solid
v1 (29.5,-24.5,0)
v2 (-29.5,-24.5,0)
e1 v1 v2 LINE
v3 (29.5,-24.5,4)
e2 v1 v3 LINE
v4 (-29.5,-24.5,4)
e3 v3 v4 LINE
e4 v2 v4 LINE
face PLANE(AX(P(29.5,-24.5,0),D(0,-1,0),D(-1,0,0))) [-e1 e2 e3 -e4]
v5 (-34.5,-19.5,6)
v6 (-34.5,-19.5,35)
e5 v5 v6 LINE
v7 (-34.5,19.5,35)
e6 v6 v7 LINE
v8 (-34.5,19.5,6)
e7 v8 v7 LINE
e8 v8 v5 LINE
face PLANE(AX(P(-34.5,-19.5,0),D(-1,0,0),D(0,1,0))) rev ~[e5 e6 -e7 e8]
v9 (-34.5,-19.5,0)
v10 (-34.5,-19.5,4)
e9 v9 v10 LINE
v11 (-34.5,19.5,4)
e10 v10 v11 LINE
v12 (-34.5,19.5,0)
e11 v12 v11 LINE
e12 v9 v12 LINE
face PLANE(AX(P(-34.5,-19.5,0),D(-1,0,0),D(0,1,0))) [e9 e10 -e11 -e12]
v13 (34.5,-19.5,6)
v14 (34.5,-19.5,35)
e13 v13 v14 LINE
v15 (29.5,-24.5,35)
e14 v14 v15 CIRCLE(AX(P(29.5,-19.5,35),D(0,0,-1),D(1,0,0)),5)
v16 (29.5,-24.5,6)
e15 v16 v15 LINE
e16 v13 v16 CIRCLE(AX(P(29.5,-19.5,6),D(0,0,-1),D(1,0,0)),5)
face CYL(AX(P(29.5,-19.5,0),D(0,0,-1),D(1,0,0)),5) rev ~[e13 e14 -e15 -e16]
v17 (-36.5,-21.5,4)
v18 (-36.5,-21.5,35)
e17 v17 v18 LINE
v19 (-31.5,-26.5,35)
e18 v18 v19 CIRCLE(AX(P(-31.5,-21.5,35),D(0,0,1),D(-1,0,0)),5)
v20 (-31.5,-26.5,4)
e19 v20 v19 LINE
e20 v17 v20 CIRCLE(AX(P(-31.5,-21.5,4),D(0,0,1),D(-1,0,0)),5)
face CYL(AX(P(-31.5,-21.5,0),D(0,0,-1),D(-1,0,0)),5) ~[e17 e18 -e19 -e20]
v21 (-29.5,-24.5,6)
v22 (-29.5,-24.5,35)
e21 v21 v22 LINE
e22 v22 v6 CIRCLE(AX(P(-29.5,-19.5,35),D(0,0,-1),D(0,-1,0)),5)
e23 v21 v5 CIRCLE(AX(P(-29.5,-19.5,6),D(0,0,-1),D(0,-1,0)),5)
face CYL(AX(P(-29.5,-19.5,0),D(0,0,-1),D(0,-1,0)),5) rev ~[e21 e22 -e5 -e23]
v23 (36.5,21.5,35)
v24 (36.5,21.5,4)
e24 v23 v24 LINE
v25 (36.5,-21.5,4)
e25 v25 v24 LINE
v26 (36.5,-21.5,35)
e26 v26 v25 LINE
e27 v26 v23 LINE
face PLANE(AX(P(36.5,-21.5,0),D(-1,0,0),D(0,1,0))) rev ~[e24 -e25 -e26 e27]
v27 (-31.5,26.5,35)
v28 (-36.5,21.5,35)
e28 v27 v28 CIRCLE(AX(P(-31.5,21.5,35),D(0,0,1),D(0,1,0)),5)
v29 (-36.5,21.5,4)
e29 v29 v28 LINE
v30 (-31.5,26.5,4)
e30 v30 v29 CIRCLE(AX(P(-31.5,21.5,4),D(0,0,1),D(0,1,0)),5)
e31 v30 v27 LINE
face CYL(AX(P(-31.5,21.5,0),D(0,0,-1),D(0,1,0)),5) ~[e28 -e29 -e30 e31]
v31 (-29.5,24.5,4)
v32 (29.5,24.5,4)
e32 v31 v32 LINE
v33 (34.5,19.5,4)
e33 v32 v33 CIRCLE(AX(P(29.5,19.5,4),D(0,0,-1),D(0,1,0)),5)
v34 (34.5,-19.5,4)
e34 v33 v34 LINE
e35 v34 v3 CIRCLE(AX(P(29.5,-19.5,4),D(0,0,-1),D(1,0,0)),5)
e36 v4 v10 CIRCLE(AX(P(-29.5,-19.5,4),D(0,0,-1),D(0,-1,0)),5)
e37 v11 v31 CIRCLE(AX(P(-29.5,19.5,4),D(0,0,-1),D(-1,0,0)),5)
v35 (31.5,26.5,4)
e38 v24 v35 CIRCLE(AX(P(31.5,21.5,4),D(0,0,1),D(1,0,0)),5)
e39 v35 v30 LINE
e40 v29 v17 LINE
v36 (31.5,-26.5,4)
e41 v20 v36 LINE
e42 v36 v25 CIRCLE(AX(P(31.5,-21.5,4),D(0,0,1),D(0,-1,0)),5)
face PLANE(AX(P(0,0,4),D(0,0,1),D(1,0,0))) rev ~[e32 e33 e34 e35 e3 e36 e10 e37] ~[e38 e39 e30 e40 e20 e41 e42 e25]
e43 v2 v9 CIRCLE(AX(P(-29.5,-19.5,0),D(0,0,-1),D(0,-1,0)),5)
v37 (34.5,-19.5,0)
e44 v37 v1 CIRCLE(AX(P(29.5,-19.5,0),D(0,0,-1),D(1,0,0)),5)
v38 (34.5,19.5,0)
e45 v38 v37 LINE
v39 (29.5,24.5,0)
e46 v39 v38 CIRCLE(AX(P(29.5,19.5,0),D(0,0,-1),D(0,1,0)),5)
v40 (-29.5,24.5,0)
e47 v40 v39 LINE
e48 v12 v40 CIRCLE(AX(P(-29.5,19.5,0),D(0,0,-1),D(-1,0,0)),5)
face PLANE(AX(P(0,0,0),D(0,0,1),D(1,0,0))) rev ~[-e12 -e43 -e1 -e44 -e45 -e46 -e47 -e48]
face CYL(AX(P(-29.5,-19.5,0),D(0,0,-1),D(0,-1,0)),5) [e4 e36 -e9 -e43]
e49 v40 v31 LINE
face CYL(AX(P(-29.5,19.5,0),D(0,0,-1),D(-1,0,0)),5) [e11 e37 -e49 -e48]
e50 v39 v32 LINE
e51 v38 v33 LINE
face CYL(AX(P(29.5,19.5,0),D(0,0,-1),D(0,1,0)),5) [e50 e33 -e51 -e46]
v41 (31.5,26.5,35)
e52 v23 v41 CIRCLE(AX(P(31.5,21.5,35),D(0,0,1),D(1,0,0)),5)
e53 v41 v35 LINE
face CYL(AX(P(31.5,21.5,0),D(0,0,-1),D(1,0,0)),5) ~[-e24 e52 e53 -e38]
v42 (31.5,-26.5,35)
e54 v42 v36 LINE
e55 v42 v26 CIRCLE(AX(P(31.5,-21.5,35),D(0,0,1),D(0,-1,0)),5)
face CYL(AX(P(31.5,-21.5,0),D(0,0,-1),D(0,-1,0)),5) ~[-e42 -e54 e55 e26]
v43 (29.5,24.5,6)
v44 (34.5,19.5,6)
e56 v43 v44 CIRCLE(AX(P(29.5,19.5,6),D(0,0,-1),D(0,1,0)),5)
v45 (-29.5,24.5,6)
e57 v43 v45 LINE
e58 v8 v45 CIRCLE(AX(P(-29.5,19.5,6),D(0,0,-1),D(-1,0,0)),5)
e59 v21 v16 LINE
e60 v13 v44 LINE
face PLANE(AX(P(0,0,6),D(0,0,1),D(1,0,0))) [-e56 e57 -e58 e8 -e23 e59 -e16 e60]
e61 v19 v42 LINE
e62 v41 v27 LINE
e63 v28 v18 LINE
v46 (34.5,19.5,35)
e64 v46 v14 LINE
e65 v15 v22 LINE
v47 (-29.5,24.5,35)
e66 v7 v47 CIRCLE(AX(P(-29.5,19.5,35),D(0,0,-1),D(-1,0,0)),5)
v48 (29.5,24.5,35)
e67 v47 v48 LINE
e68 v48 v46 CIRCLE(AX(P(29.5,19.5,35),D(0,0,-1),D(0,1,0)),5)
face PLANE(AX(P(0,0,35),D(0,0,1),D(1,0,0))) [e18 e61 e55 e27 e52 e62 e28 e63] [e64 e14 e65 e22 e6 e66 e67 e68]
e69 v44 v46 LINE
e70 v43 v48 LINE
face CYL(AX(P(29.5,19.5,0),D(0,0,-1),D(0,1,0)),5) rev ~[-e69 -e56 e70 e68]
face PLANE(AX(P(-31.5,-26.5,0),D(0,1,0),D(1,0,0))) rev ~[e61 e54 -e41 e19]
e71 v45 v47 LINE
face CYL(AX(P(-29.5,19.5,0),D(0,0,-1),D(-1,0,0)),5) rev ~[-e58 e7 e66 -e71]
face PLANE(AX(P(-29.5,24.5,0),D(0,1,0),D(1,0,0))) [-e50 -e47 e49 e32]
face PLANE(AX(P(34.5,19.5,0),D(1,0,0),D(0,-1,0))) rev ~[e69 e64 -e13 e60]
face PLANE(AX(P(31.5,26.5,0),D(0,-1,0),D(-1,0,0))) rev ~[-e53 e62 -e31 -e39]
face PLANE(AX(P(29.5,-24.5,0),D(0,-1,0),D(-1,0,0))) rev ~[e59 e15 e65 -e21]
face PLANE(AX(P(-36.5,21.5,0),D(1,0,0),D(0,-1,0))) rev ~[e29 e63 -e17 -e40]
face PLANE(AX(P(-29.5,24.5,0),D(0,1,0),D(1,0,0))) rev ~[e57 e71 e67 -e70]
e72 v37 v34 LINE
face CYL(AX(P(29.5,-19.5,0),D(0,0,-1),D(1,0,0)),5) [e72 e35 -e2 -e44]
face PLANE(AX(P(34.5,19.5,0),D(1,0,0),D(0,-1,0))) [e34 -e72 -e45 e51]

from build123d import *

# Parameters (mm, degrees)
F1_DEPTH = 6
F2_DEPTH = 35
F3_DEPTH = 4


with BuildPart() as f1:
    # F0 (on Top) → F1 (new body)
    with BuildSketch(Plane.XY):
        with BuildLine():
            Line((31.5, 26.5), (-31.5, 26.5))
            ThreePointArc((-31.5, 26.5), (-35.0355339059, 25.0355339059), (-36.5, 21.5))
            Line((-36.5, 21.5), (-36.5, -21.5))
            ThreePointArc((-36.5, -21.5), (-35.0355339059, -25.0355339059), (-31.5, -26.5))
            Line((-31.5, -26.5), (31.5, -26.5))
            ThreePointArc((31.5, -26.5), (35.0355339059, -25.0355339059), (36.5, -21.5))
            Line((36.5, -21.5), (36.5, 21.5))
            ThreePointArc((36.5, 21.5), (35.0355339059, 25.0355339059), (31.5, 26.5))
        make_face()
        with BuildLine():
            ThreePointArc((-34.5, 19.5), (-33.0355339059, 23.0355339059), (-29.5, 24.5))
            Line((-29.5, 24.5), (29.5, 24.5))
            ThreePointArc((29.5, 24.5), (33.0355339059, 23.0355339059), (34.5, 19.5))
            Line((34.5, 19.5), (34.5, -19.5))
            ThreePointArc((34.5, -19.5), (33.0355339059, -23.0355339059), (29.5, -24.5))
            Line((29.5, -24.5), (-29.5, -24.5))
            ThreePointArc((-29.5, -24.5), (-33.0355339059, -23.0355339059), (-34.5, -19.5))
            Line((-34.5, -19.5), (-34.5, 19.5))
        make_face(mode=Mode.SUBTRACT)
        with BuildLine():
            Line((29.5, 24.5), (-29.5, 24.5))
            ThreePointArc((-29.5, 24.5), (-33.0355339059, 23.0355339059), (-34.5, 19.5))
            Line((-34.5, 19.5), (-34.5, -19.5))
            ThreePointArc((-34.5, -19.5), (-33.0355339059, -23.0355339059), (-29.5, -24.5))
            Line((-29.5, -24.5), (29.5, -24.5))
            ThreePointArc((29.5, -24.5), (33.0355339059, -23.0355339059), (34.5, -19.5))
            Line((34.5, -19.5), (34.5, 19.5))
            ThreePointArc((34.5, 19.5), (33.0355339059, 23.0355339059), (29.5, 24.5))
        make_face()
    extrude(amount=F1_DEPTH)

    # F0 (on Top) → F2 (join)
    with BuildSketch(Plane.XY):
        with BuildLine():
            Line((31.5, 26.5), (-31.5, 26.5))
            ThreePointArc((-31.5, 26.5), (-35.0355339059, 25.0355339059), (-36.5, 21.5))
            Line((-36.5, 21.5), (-36.5, -21.5))
            ThreePointArc((-36.5, -21.5), (-35.0355339059, -25.0355339059), (-31.5, -26.5))
            Line((-31.5, -26.5), (31.5, -26.5))
            ThreePointArc((31.5, -26.5), (35.0355339059, -25.0355339059), (36.5, -21.5))
            Line((36.5, -21.5), (36.5, 21.5))
            ThreePointArc((36.5, 21.5), (35.0355339059, 25.0355339059), (31.5, 26.5))
        make_face()
        with BuildLine():
            ThreePointArc((-34.5, 19.5), (-33.0355339059, 23.0355339059), (-29.5, 24.5))
            Line((-29.5, 24.5), (29.5, 24.5))
            ThreePointArc((29.5, 24.5), (33.0355339059, 23.0355339059), (34.5, 19.5))
            Line((34.5, 19.5), (34.5, -19.5))
            ThreePointArc((34.5, -19.5), (33.0355339059, -23.0355339059), (29.5, -24.5))
            Line((29.5, -24.5), (-29.5, -24.5))
            ThreePointArc((-29.5, -24.5), (-33.0355339059, -23.0355339059), (-34.5, -19.5))
            Line((-34.5, -19.5), (-34.5, 19.5))
        make_face(mode=Mode.SUBTRACT)
    extrude(amount=F2_DEPTH)

    # F0 (on Top) → F3 (cut)
    with BuildSketch(Plane.XY):
        with BuildLine():
            Line((31.5, 26.5), (-31.5, 26.5))
            ThreePointArc((-31.5, 26.5), (-35.0355339059, 25.0355339059), (-36.5, 21.5))
            Line((-36.5, 21.5), (-36.5, -21.5))
            ThreePointArc((-36.5, -21.5), (-35.0355339059, -25.0355339059), (-31.5, -26.5))
            Line((-31.5, -26.5), (31.5, -26.5))
            ThreePointArc((31.5, -26.5), (35.0355339059, -25.0355339059), (36.5, -21.5))
            Line((36.5, -21.5), (36.5, 21.5))
            ThreePointArc((36.5, 21.5), (35.0355339059, 25.0355339059), (31.5, 26.5))
        make_face()
        with BuildLine():
            ThreePointArc((-34.5, 19.5), (-33.0355339059, 23.0355339059), (-29.5, 24.5))
            Line((-29.5, 24.5), (29.5, 24.5))
            ThreePointArc((29.5, 24.5), (33.0355339059, 23.0355339059), (34.5, 19.5))
            Line((34.5, 19.5), (34.5, -19.5))
            ThreePointArc((34.5, -19.5), (33.0355339059, -23.0355339059), (29.5, -24.5))
            Line((29.5, -24.5), (-29.5, -24.5))
            ThreePointArc((-29.5, -24.5), (-33.0355339059, -23.0355339059), (-34.5, -19.5))
            Line((-34.5, -19.5), (-34.5, 19.5))
        make_face(mode=Mode.SUBTRACT)
    extrude(amount=F3_DEPTH, mode=Mode.SUBTRACT)


solid = f1.part
